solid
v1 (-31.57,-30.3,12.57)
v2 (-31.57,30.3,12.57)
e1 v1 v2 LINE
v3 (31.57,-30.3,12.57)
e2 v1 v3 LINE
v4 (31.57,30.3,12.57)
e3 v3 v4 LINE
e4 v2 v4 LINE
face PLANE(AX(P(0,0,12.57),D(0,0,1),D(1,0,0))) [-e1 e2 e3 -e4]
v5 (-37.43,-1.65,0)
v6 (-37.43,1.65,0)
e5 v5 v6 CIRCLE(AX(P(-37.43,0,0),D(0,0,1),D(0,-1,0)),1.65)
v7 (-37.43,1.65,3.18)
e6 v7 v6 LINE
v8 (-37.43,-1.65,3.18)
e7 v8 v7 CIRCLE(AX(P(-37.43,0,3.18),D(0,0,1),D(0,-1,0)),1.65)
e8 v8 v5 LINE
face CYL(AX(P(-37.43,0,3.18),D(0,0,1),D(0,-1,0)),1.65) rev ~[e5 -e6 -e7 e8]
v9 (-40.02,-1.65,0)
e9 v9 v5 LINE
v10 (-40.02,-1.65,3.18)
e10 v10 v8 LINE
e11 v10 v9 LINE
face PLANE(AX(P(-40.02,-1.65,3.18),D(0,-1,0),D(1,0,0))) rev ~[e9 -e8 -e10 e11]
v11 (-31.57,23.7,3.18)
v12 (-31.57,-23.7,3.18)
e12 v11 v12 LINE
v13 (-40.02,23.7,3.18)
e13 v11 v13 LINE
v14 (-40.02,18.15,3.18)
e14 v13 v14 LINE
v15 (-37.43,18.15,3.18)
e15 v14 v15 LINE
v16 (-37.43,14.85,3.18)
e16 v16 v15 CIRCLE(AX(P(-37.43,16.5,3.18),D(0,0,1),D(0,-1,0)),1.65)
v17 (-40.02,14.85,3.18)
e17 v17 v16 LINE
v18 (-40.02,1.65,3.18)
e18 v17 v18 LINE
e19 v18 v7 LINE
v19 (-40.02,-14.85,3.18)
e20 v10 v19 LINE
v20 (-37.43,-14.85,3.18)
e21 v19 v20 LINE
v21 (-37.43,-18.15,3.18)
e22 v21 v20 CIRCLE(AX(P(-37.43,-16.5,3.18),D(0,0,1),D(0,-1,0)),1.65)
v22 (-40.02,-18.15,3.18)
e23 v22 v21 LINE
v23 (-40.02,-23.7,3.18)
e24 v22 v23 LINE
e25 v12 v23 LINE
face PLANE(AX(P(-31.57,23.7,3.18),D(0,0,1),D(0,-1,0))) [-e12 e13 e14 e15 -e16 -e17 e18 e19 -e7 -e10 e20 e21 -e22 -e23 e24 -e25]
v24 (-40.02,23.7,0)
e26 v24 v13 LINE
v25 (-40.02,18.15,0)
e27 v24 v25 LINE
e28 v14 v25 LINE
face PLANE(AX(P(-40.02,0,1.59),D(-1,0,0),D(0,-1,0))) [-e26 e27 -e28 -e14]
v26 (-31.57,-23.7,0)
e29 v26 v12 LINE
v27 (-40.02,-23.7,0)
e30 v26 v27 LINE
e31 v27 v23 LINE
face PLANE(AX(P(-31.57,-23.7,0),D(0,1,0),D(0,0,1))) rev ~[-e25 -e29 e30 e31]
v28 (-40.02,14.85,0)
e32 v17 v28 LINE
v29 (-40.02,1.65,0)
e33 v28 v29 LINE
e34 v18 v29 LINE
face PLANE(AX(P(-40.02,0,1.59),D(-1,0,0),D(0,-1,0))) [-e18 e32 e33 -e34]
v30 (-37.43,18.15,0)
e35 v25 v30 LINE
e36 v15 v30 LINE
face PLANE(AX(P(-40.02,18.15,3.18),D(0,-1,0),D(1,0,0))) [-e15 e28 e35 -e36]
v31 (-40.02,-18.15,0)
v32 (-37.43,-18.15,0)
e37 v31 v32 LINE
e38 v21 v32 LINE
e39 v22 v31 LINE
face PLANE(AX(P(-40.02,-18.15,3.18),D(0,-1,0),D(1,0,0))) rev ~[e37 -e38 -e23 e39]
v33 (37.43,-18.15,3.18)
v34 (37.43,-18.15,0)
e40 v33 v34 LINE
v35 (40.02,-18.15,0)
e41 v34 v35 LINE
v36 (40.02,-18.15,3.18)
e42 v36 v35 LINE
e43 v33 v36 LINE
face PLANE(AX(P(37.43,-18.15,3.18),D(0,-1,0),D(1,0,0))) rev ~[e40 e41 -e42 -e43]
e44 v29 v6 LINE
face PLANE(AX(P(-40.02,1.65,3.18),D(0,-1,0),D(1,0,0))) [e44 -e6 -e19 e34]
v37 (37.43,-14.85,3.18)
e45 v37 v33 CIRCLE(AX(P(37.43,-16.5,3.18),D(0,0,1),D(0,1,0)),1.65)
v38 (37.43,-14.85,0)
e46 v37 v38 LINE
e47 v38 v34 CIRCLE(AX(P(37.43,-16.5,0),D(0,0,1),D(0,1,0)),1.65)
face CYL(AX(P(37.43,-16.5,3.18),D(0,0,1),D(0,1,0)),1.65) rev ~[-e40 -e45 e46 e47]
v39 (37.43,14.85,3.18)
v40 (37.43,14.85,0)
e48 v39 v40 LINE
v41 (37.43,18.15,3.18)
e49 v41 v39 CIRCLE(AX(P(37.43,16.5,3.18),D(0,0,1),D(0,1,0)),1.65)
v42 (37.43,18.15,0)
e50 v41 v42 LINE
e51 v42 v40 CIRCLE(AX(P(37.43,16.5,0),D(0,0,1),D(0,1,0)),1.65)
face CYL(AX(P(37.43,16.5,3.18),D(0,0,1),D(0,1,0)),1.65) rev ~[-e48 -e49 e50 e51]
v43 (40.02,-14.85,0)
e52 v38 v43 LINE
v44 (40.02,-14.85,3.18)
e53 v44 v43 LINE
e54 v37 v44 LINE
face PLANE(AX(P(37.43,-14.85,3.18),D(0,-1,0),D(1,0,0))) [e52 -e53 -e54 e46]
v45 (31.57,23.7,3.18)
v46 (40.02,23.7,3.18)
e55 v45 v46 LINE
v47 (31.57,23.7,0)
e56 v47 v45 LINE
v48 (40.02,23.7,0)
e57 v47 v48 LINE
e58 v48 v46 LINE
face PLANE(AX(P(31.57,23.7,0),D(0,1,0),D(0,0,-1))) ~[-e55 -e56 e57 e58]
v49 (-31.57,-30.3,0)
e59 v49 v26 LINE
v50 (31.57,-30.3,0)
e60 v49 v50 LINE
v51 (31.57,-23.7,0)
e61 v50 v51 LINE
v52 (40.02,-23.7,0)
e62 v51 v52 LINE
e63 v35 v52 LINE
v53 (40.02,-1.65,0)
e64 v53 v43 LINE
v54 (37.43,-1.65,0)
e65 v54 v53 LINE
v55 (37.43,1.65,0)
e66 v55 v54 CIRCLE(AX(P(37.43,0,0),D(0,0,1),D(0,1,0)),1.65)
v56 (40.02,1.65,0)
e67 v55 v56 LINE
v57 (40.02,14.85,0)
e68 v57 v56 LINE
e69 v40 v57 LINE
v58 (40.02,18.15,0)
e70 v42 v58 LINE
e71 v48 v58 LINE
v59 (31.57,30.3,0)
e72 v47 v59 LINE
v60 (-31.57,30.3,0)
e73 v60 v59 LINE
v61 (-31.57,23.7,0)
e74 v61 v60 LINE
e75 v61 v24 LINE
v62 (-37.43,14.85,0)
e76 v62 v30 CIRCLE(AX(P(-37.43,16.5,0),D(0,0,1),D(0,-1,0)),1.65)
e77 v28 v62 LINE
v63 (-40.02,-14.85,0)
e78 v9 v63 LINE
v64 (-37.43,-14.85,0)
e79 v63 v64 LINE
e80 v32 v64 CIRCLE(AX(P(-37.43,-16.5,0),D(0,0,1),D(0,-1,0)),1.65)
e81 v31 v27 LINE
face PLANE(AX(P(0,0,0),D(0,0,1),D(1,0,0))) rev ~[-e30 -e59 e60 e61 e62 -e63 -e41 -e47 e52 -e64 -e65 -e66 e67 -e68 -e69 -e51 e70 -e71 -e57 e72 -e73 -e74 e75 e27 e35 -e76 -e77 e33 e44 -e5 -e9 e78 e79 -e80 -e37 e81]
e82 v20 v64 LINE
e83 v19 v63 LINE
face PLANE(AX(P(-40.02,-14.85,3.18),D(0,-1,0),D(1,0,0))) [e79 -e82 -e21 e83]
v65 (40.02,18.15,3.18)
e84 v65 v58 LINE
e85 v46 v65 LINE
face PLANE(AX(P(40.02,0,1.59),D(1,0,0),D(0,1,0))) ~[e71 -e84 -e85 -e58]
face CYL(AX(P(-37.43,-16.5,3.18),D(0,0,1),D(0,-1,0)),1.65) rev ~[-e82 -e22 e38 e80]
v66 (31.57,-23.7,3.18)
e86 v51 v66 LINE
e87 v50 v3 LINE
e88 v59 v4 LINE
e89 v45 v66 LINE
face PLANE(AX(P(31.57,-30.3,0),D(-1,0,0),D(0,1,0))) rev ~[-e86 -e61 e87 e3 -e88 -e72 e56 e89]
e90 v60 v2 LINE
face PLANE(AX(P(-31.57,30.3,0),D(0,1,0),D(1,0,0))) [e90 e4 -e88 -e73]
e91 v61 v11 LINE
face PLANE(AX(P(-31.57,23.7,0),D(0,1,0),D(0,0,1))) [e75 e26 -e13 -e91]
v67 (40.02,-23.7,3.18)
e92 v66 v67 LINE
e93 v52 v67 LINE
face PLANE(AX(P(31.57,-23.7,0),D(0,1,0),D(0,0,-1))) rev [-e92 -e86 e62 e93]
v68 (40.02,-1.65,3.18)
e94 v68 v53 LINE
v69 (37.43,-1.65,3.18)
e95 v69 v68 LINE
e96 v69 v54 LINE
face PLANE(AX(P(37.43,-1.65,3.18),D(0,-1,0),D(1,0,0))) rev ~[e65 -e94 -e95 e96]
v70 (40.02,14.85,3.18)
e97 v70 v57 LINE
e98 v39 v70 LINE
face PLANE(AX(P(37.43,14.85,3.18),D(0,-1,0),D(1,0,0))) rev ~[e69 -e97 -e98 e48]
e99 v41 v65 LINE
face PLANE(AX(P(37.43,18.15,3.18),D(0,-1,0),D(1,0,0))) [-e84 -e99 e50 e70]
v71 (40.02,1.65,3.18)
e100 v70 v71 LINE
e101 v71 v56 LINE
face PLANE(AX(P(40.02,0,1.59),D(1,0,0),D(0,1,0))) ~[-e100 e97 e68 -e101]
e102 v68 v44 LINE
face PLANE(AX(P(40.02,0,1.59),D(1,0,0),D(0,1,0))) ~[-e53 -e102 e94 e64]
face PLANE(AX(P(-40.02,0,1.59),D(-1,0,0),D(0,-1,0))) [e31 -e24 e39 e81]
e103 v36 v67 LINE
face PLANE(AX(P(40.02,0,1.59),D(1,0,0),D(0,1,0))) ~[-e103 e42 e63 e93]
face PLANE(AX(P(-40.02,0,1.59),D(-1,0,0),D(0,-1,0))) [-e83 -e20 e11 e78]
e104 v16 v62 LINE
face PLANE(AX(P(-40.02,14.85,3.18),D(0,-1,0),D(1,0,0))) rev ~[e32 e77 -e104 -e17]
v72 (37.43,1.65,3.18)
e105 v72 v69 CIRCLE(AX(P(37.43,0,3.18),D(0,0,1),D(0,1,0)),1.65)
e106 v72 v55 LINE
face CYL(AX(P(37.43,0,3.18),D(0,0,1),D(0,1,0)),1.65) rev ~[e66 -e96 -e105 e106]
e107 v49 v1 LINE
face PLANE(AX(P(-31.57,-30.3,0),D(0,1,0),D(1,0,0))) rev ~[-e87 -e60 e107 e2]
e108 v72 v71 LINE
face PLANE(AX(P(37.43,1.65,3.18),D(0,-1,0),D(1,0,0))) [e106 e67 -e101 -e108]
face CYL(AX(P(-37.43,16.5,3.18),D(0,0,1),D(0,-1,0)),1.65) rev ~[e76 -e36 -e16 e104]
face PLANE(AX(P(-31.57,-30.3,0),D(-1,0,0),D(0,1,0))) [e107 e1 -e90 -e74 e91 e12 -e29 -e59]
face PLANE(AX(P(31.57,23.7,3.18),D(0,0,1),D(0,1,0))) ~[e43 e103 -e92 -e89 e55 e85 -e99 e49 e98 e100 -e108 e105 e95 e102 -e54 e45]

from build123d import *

# Parameters (mm, degrees)
F0_W     = 63.14
F0_H     = 60.6
F1_DEPTH = 12.57
F2_W     = 47.4
F2_H     = 3.18
F3_DEPTH = 8.45
F5_W     = 2.59
F5_H     = 3.3
F6_DEPTH = 3.18


# Not quite as in the source:
# - a feature names something its author has since deleted; it is built from what else it names


with BuildPart() as f1:
    # F0 (on Top) → F1 (new body)
    with BuildSketch(Plane.XY):
        Rectangle(F0_W, F0_H)
    extrude(amount=F1_DEPTH)

    # F2 (on face) → F3 (join)
    with BuildSketch(Plane(origin=(-31.57, 0, 0), x_dir=(0, -1, 0), z_dir=(-1, 0, 0))):
        with Locations((0, 1.59)):
            Rectangle(F2_W, F2_H)
    extrude(amount=F3_DEPTH)

    # F4: F1 across plane


with BuildPart() as f1_1:
    add(f1.part)
    add(f1.part.mirror(Plane.YZ))

    # F5 (on face) → F6 (cut, through all)
    with BuildSketch(Plane.XY.offset(3.18)):
        with Locations((-38.725, 16.5)):
            Rectangle(F5_W, F5_H)
        with BuildLine():
            Line((-37.43, 18.15), (-37.43, 14.85))
            ThreePointArc((-37.43, 14.85), (-35.78, 16.5), (-37.43, 18.15))
        make_face()
        with Locations((-38.725, 0)):
            Rectangle(F5_W, F5_H)
        with BuildLine():
            ThreePointArc((-37.43, -1.65), (-35.78, 0), (-37.43, 1.65))
            Line((-37.43, 1.65), (-37.43, -1.65))
        make_face()
        with Locations((-38.725, -16.5)):
            Rectangle(F5_W, F5_H)
        with BuildLine():
            ThreePointArc((-37.43, -18.15), (-35.78, -16.5), (-37.43, -14.85))
            Line((-37.43, -14.85), (-37.43, -18.15))
        make_face()
        with BuildLine():
            Line((37.43, 14.85), (37.43, 18.15))
            ThreePointArc((37.43, 18.15), (35.78, 16.5), (37.43, 14.85))
        make_face()
        with Locations((38.725, 16.5)):
            Rectangle(F5_W, F5_H)
        with BuildLine():
            ThreePointArc((37.43, 1.65), (35.78, 0), (37.43, -1.65))
            Line((37.43, -1.65), (37.43, 1.65))
        make_face()
        with Locations((38.725, 0)):
            Rectangle(F5_W, F5_H)
        with BuildLine():
            ThreePointArc((37.43, -14.85), (35.78, -16.5), (37.43, -18.15))
            Line((37.43, -18.15), (37.43, -14.85))
        make_face()
        with Locations((38.725, -16.5)):
            Rectangle(F5_W, F5_H)
    extrude(amount=-F6_DEPTH, mode=Mode.SUBTRACT)


solid = f1_1.part
